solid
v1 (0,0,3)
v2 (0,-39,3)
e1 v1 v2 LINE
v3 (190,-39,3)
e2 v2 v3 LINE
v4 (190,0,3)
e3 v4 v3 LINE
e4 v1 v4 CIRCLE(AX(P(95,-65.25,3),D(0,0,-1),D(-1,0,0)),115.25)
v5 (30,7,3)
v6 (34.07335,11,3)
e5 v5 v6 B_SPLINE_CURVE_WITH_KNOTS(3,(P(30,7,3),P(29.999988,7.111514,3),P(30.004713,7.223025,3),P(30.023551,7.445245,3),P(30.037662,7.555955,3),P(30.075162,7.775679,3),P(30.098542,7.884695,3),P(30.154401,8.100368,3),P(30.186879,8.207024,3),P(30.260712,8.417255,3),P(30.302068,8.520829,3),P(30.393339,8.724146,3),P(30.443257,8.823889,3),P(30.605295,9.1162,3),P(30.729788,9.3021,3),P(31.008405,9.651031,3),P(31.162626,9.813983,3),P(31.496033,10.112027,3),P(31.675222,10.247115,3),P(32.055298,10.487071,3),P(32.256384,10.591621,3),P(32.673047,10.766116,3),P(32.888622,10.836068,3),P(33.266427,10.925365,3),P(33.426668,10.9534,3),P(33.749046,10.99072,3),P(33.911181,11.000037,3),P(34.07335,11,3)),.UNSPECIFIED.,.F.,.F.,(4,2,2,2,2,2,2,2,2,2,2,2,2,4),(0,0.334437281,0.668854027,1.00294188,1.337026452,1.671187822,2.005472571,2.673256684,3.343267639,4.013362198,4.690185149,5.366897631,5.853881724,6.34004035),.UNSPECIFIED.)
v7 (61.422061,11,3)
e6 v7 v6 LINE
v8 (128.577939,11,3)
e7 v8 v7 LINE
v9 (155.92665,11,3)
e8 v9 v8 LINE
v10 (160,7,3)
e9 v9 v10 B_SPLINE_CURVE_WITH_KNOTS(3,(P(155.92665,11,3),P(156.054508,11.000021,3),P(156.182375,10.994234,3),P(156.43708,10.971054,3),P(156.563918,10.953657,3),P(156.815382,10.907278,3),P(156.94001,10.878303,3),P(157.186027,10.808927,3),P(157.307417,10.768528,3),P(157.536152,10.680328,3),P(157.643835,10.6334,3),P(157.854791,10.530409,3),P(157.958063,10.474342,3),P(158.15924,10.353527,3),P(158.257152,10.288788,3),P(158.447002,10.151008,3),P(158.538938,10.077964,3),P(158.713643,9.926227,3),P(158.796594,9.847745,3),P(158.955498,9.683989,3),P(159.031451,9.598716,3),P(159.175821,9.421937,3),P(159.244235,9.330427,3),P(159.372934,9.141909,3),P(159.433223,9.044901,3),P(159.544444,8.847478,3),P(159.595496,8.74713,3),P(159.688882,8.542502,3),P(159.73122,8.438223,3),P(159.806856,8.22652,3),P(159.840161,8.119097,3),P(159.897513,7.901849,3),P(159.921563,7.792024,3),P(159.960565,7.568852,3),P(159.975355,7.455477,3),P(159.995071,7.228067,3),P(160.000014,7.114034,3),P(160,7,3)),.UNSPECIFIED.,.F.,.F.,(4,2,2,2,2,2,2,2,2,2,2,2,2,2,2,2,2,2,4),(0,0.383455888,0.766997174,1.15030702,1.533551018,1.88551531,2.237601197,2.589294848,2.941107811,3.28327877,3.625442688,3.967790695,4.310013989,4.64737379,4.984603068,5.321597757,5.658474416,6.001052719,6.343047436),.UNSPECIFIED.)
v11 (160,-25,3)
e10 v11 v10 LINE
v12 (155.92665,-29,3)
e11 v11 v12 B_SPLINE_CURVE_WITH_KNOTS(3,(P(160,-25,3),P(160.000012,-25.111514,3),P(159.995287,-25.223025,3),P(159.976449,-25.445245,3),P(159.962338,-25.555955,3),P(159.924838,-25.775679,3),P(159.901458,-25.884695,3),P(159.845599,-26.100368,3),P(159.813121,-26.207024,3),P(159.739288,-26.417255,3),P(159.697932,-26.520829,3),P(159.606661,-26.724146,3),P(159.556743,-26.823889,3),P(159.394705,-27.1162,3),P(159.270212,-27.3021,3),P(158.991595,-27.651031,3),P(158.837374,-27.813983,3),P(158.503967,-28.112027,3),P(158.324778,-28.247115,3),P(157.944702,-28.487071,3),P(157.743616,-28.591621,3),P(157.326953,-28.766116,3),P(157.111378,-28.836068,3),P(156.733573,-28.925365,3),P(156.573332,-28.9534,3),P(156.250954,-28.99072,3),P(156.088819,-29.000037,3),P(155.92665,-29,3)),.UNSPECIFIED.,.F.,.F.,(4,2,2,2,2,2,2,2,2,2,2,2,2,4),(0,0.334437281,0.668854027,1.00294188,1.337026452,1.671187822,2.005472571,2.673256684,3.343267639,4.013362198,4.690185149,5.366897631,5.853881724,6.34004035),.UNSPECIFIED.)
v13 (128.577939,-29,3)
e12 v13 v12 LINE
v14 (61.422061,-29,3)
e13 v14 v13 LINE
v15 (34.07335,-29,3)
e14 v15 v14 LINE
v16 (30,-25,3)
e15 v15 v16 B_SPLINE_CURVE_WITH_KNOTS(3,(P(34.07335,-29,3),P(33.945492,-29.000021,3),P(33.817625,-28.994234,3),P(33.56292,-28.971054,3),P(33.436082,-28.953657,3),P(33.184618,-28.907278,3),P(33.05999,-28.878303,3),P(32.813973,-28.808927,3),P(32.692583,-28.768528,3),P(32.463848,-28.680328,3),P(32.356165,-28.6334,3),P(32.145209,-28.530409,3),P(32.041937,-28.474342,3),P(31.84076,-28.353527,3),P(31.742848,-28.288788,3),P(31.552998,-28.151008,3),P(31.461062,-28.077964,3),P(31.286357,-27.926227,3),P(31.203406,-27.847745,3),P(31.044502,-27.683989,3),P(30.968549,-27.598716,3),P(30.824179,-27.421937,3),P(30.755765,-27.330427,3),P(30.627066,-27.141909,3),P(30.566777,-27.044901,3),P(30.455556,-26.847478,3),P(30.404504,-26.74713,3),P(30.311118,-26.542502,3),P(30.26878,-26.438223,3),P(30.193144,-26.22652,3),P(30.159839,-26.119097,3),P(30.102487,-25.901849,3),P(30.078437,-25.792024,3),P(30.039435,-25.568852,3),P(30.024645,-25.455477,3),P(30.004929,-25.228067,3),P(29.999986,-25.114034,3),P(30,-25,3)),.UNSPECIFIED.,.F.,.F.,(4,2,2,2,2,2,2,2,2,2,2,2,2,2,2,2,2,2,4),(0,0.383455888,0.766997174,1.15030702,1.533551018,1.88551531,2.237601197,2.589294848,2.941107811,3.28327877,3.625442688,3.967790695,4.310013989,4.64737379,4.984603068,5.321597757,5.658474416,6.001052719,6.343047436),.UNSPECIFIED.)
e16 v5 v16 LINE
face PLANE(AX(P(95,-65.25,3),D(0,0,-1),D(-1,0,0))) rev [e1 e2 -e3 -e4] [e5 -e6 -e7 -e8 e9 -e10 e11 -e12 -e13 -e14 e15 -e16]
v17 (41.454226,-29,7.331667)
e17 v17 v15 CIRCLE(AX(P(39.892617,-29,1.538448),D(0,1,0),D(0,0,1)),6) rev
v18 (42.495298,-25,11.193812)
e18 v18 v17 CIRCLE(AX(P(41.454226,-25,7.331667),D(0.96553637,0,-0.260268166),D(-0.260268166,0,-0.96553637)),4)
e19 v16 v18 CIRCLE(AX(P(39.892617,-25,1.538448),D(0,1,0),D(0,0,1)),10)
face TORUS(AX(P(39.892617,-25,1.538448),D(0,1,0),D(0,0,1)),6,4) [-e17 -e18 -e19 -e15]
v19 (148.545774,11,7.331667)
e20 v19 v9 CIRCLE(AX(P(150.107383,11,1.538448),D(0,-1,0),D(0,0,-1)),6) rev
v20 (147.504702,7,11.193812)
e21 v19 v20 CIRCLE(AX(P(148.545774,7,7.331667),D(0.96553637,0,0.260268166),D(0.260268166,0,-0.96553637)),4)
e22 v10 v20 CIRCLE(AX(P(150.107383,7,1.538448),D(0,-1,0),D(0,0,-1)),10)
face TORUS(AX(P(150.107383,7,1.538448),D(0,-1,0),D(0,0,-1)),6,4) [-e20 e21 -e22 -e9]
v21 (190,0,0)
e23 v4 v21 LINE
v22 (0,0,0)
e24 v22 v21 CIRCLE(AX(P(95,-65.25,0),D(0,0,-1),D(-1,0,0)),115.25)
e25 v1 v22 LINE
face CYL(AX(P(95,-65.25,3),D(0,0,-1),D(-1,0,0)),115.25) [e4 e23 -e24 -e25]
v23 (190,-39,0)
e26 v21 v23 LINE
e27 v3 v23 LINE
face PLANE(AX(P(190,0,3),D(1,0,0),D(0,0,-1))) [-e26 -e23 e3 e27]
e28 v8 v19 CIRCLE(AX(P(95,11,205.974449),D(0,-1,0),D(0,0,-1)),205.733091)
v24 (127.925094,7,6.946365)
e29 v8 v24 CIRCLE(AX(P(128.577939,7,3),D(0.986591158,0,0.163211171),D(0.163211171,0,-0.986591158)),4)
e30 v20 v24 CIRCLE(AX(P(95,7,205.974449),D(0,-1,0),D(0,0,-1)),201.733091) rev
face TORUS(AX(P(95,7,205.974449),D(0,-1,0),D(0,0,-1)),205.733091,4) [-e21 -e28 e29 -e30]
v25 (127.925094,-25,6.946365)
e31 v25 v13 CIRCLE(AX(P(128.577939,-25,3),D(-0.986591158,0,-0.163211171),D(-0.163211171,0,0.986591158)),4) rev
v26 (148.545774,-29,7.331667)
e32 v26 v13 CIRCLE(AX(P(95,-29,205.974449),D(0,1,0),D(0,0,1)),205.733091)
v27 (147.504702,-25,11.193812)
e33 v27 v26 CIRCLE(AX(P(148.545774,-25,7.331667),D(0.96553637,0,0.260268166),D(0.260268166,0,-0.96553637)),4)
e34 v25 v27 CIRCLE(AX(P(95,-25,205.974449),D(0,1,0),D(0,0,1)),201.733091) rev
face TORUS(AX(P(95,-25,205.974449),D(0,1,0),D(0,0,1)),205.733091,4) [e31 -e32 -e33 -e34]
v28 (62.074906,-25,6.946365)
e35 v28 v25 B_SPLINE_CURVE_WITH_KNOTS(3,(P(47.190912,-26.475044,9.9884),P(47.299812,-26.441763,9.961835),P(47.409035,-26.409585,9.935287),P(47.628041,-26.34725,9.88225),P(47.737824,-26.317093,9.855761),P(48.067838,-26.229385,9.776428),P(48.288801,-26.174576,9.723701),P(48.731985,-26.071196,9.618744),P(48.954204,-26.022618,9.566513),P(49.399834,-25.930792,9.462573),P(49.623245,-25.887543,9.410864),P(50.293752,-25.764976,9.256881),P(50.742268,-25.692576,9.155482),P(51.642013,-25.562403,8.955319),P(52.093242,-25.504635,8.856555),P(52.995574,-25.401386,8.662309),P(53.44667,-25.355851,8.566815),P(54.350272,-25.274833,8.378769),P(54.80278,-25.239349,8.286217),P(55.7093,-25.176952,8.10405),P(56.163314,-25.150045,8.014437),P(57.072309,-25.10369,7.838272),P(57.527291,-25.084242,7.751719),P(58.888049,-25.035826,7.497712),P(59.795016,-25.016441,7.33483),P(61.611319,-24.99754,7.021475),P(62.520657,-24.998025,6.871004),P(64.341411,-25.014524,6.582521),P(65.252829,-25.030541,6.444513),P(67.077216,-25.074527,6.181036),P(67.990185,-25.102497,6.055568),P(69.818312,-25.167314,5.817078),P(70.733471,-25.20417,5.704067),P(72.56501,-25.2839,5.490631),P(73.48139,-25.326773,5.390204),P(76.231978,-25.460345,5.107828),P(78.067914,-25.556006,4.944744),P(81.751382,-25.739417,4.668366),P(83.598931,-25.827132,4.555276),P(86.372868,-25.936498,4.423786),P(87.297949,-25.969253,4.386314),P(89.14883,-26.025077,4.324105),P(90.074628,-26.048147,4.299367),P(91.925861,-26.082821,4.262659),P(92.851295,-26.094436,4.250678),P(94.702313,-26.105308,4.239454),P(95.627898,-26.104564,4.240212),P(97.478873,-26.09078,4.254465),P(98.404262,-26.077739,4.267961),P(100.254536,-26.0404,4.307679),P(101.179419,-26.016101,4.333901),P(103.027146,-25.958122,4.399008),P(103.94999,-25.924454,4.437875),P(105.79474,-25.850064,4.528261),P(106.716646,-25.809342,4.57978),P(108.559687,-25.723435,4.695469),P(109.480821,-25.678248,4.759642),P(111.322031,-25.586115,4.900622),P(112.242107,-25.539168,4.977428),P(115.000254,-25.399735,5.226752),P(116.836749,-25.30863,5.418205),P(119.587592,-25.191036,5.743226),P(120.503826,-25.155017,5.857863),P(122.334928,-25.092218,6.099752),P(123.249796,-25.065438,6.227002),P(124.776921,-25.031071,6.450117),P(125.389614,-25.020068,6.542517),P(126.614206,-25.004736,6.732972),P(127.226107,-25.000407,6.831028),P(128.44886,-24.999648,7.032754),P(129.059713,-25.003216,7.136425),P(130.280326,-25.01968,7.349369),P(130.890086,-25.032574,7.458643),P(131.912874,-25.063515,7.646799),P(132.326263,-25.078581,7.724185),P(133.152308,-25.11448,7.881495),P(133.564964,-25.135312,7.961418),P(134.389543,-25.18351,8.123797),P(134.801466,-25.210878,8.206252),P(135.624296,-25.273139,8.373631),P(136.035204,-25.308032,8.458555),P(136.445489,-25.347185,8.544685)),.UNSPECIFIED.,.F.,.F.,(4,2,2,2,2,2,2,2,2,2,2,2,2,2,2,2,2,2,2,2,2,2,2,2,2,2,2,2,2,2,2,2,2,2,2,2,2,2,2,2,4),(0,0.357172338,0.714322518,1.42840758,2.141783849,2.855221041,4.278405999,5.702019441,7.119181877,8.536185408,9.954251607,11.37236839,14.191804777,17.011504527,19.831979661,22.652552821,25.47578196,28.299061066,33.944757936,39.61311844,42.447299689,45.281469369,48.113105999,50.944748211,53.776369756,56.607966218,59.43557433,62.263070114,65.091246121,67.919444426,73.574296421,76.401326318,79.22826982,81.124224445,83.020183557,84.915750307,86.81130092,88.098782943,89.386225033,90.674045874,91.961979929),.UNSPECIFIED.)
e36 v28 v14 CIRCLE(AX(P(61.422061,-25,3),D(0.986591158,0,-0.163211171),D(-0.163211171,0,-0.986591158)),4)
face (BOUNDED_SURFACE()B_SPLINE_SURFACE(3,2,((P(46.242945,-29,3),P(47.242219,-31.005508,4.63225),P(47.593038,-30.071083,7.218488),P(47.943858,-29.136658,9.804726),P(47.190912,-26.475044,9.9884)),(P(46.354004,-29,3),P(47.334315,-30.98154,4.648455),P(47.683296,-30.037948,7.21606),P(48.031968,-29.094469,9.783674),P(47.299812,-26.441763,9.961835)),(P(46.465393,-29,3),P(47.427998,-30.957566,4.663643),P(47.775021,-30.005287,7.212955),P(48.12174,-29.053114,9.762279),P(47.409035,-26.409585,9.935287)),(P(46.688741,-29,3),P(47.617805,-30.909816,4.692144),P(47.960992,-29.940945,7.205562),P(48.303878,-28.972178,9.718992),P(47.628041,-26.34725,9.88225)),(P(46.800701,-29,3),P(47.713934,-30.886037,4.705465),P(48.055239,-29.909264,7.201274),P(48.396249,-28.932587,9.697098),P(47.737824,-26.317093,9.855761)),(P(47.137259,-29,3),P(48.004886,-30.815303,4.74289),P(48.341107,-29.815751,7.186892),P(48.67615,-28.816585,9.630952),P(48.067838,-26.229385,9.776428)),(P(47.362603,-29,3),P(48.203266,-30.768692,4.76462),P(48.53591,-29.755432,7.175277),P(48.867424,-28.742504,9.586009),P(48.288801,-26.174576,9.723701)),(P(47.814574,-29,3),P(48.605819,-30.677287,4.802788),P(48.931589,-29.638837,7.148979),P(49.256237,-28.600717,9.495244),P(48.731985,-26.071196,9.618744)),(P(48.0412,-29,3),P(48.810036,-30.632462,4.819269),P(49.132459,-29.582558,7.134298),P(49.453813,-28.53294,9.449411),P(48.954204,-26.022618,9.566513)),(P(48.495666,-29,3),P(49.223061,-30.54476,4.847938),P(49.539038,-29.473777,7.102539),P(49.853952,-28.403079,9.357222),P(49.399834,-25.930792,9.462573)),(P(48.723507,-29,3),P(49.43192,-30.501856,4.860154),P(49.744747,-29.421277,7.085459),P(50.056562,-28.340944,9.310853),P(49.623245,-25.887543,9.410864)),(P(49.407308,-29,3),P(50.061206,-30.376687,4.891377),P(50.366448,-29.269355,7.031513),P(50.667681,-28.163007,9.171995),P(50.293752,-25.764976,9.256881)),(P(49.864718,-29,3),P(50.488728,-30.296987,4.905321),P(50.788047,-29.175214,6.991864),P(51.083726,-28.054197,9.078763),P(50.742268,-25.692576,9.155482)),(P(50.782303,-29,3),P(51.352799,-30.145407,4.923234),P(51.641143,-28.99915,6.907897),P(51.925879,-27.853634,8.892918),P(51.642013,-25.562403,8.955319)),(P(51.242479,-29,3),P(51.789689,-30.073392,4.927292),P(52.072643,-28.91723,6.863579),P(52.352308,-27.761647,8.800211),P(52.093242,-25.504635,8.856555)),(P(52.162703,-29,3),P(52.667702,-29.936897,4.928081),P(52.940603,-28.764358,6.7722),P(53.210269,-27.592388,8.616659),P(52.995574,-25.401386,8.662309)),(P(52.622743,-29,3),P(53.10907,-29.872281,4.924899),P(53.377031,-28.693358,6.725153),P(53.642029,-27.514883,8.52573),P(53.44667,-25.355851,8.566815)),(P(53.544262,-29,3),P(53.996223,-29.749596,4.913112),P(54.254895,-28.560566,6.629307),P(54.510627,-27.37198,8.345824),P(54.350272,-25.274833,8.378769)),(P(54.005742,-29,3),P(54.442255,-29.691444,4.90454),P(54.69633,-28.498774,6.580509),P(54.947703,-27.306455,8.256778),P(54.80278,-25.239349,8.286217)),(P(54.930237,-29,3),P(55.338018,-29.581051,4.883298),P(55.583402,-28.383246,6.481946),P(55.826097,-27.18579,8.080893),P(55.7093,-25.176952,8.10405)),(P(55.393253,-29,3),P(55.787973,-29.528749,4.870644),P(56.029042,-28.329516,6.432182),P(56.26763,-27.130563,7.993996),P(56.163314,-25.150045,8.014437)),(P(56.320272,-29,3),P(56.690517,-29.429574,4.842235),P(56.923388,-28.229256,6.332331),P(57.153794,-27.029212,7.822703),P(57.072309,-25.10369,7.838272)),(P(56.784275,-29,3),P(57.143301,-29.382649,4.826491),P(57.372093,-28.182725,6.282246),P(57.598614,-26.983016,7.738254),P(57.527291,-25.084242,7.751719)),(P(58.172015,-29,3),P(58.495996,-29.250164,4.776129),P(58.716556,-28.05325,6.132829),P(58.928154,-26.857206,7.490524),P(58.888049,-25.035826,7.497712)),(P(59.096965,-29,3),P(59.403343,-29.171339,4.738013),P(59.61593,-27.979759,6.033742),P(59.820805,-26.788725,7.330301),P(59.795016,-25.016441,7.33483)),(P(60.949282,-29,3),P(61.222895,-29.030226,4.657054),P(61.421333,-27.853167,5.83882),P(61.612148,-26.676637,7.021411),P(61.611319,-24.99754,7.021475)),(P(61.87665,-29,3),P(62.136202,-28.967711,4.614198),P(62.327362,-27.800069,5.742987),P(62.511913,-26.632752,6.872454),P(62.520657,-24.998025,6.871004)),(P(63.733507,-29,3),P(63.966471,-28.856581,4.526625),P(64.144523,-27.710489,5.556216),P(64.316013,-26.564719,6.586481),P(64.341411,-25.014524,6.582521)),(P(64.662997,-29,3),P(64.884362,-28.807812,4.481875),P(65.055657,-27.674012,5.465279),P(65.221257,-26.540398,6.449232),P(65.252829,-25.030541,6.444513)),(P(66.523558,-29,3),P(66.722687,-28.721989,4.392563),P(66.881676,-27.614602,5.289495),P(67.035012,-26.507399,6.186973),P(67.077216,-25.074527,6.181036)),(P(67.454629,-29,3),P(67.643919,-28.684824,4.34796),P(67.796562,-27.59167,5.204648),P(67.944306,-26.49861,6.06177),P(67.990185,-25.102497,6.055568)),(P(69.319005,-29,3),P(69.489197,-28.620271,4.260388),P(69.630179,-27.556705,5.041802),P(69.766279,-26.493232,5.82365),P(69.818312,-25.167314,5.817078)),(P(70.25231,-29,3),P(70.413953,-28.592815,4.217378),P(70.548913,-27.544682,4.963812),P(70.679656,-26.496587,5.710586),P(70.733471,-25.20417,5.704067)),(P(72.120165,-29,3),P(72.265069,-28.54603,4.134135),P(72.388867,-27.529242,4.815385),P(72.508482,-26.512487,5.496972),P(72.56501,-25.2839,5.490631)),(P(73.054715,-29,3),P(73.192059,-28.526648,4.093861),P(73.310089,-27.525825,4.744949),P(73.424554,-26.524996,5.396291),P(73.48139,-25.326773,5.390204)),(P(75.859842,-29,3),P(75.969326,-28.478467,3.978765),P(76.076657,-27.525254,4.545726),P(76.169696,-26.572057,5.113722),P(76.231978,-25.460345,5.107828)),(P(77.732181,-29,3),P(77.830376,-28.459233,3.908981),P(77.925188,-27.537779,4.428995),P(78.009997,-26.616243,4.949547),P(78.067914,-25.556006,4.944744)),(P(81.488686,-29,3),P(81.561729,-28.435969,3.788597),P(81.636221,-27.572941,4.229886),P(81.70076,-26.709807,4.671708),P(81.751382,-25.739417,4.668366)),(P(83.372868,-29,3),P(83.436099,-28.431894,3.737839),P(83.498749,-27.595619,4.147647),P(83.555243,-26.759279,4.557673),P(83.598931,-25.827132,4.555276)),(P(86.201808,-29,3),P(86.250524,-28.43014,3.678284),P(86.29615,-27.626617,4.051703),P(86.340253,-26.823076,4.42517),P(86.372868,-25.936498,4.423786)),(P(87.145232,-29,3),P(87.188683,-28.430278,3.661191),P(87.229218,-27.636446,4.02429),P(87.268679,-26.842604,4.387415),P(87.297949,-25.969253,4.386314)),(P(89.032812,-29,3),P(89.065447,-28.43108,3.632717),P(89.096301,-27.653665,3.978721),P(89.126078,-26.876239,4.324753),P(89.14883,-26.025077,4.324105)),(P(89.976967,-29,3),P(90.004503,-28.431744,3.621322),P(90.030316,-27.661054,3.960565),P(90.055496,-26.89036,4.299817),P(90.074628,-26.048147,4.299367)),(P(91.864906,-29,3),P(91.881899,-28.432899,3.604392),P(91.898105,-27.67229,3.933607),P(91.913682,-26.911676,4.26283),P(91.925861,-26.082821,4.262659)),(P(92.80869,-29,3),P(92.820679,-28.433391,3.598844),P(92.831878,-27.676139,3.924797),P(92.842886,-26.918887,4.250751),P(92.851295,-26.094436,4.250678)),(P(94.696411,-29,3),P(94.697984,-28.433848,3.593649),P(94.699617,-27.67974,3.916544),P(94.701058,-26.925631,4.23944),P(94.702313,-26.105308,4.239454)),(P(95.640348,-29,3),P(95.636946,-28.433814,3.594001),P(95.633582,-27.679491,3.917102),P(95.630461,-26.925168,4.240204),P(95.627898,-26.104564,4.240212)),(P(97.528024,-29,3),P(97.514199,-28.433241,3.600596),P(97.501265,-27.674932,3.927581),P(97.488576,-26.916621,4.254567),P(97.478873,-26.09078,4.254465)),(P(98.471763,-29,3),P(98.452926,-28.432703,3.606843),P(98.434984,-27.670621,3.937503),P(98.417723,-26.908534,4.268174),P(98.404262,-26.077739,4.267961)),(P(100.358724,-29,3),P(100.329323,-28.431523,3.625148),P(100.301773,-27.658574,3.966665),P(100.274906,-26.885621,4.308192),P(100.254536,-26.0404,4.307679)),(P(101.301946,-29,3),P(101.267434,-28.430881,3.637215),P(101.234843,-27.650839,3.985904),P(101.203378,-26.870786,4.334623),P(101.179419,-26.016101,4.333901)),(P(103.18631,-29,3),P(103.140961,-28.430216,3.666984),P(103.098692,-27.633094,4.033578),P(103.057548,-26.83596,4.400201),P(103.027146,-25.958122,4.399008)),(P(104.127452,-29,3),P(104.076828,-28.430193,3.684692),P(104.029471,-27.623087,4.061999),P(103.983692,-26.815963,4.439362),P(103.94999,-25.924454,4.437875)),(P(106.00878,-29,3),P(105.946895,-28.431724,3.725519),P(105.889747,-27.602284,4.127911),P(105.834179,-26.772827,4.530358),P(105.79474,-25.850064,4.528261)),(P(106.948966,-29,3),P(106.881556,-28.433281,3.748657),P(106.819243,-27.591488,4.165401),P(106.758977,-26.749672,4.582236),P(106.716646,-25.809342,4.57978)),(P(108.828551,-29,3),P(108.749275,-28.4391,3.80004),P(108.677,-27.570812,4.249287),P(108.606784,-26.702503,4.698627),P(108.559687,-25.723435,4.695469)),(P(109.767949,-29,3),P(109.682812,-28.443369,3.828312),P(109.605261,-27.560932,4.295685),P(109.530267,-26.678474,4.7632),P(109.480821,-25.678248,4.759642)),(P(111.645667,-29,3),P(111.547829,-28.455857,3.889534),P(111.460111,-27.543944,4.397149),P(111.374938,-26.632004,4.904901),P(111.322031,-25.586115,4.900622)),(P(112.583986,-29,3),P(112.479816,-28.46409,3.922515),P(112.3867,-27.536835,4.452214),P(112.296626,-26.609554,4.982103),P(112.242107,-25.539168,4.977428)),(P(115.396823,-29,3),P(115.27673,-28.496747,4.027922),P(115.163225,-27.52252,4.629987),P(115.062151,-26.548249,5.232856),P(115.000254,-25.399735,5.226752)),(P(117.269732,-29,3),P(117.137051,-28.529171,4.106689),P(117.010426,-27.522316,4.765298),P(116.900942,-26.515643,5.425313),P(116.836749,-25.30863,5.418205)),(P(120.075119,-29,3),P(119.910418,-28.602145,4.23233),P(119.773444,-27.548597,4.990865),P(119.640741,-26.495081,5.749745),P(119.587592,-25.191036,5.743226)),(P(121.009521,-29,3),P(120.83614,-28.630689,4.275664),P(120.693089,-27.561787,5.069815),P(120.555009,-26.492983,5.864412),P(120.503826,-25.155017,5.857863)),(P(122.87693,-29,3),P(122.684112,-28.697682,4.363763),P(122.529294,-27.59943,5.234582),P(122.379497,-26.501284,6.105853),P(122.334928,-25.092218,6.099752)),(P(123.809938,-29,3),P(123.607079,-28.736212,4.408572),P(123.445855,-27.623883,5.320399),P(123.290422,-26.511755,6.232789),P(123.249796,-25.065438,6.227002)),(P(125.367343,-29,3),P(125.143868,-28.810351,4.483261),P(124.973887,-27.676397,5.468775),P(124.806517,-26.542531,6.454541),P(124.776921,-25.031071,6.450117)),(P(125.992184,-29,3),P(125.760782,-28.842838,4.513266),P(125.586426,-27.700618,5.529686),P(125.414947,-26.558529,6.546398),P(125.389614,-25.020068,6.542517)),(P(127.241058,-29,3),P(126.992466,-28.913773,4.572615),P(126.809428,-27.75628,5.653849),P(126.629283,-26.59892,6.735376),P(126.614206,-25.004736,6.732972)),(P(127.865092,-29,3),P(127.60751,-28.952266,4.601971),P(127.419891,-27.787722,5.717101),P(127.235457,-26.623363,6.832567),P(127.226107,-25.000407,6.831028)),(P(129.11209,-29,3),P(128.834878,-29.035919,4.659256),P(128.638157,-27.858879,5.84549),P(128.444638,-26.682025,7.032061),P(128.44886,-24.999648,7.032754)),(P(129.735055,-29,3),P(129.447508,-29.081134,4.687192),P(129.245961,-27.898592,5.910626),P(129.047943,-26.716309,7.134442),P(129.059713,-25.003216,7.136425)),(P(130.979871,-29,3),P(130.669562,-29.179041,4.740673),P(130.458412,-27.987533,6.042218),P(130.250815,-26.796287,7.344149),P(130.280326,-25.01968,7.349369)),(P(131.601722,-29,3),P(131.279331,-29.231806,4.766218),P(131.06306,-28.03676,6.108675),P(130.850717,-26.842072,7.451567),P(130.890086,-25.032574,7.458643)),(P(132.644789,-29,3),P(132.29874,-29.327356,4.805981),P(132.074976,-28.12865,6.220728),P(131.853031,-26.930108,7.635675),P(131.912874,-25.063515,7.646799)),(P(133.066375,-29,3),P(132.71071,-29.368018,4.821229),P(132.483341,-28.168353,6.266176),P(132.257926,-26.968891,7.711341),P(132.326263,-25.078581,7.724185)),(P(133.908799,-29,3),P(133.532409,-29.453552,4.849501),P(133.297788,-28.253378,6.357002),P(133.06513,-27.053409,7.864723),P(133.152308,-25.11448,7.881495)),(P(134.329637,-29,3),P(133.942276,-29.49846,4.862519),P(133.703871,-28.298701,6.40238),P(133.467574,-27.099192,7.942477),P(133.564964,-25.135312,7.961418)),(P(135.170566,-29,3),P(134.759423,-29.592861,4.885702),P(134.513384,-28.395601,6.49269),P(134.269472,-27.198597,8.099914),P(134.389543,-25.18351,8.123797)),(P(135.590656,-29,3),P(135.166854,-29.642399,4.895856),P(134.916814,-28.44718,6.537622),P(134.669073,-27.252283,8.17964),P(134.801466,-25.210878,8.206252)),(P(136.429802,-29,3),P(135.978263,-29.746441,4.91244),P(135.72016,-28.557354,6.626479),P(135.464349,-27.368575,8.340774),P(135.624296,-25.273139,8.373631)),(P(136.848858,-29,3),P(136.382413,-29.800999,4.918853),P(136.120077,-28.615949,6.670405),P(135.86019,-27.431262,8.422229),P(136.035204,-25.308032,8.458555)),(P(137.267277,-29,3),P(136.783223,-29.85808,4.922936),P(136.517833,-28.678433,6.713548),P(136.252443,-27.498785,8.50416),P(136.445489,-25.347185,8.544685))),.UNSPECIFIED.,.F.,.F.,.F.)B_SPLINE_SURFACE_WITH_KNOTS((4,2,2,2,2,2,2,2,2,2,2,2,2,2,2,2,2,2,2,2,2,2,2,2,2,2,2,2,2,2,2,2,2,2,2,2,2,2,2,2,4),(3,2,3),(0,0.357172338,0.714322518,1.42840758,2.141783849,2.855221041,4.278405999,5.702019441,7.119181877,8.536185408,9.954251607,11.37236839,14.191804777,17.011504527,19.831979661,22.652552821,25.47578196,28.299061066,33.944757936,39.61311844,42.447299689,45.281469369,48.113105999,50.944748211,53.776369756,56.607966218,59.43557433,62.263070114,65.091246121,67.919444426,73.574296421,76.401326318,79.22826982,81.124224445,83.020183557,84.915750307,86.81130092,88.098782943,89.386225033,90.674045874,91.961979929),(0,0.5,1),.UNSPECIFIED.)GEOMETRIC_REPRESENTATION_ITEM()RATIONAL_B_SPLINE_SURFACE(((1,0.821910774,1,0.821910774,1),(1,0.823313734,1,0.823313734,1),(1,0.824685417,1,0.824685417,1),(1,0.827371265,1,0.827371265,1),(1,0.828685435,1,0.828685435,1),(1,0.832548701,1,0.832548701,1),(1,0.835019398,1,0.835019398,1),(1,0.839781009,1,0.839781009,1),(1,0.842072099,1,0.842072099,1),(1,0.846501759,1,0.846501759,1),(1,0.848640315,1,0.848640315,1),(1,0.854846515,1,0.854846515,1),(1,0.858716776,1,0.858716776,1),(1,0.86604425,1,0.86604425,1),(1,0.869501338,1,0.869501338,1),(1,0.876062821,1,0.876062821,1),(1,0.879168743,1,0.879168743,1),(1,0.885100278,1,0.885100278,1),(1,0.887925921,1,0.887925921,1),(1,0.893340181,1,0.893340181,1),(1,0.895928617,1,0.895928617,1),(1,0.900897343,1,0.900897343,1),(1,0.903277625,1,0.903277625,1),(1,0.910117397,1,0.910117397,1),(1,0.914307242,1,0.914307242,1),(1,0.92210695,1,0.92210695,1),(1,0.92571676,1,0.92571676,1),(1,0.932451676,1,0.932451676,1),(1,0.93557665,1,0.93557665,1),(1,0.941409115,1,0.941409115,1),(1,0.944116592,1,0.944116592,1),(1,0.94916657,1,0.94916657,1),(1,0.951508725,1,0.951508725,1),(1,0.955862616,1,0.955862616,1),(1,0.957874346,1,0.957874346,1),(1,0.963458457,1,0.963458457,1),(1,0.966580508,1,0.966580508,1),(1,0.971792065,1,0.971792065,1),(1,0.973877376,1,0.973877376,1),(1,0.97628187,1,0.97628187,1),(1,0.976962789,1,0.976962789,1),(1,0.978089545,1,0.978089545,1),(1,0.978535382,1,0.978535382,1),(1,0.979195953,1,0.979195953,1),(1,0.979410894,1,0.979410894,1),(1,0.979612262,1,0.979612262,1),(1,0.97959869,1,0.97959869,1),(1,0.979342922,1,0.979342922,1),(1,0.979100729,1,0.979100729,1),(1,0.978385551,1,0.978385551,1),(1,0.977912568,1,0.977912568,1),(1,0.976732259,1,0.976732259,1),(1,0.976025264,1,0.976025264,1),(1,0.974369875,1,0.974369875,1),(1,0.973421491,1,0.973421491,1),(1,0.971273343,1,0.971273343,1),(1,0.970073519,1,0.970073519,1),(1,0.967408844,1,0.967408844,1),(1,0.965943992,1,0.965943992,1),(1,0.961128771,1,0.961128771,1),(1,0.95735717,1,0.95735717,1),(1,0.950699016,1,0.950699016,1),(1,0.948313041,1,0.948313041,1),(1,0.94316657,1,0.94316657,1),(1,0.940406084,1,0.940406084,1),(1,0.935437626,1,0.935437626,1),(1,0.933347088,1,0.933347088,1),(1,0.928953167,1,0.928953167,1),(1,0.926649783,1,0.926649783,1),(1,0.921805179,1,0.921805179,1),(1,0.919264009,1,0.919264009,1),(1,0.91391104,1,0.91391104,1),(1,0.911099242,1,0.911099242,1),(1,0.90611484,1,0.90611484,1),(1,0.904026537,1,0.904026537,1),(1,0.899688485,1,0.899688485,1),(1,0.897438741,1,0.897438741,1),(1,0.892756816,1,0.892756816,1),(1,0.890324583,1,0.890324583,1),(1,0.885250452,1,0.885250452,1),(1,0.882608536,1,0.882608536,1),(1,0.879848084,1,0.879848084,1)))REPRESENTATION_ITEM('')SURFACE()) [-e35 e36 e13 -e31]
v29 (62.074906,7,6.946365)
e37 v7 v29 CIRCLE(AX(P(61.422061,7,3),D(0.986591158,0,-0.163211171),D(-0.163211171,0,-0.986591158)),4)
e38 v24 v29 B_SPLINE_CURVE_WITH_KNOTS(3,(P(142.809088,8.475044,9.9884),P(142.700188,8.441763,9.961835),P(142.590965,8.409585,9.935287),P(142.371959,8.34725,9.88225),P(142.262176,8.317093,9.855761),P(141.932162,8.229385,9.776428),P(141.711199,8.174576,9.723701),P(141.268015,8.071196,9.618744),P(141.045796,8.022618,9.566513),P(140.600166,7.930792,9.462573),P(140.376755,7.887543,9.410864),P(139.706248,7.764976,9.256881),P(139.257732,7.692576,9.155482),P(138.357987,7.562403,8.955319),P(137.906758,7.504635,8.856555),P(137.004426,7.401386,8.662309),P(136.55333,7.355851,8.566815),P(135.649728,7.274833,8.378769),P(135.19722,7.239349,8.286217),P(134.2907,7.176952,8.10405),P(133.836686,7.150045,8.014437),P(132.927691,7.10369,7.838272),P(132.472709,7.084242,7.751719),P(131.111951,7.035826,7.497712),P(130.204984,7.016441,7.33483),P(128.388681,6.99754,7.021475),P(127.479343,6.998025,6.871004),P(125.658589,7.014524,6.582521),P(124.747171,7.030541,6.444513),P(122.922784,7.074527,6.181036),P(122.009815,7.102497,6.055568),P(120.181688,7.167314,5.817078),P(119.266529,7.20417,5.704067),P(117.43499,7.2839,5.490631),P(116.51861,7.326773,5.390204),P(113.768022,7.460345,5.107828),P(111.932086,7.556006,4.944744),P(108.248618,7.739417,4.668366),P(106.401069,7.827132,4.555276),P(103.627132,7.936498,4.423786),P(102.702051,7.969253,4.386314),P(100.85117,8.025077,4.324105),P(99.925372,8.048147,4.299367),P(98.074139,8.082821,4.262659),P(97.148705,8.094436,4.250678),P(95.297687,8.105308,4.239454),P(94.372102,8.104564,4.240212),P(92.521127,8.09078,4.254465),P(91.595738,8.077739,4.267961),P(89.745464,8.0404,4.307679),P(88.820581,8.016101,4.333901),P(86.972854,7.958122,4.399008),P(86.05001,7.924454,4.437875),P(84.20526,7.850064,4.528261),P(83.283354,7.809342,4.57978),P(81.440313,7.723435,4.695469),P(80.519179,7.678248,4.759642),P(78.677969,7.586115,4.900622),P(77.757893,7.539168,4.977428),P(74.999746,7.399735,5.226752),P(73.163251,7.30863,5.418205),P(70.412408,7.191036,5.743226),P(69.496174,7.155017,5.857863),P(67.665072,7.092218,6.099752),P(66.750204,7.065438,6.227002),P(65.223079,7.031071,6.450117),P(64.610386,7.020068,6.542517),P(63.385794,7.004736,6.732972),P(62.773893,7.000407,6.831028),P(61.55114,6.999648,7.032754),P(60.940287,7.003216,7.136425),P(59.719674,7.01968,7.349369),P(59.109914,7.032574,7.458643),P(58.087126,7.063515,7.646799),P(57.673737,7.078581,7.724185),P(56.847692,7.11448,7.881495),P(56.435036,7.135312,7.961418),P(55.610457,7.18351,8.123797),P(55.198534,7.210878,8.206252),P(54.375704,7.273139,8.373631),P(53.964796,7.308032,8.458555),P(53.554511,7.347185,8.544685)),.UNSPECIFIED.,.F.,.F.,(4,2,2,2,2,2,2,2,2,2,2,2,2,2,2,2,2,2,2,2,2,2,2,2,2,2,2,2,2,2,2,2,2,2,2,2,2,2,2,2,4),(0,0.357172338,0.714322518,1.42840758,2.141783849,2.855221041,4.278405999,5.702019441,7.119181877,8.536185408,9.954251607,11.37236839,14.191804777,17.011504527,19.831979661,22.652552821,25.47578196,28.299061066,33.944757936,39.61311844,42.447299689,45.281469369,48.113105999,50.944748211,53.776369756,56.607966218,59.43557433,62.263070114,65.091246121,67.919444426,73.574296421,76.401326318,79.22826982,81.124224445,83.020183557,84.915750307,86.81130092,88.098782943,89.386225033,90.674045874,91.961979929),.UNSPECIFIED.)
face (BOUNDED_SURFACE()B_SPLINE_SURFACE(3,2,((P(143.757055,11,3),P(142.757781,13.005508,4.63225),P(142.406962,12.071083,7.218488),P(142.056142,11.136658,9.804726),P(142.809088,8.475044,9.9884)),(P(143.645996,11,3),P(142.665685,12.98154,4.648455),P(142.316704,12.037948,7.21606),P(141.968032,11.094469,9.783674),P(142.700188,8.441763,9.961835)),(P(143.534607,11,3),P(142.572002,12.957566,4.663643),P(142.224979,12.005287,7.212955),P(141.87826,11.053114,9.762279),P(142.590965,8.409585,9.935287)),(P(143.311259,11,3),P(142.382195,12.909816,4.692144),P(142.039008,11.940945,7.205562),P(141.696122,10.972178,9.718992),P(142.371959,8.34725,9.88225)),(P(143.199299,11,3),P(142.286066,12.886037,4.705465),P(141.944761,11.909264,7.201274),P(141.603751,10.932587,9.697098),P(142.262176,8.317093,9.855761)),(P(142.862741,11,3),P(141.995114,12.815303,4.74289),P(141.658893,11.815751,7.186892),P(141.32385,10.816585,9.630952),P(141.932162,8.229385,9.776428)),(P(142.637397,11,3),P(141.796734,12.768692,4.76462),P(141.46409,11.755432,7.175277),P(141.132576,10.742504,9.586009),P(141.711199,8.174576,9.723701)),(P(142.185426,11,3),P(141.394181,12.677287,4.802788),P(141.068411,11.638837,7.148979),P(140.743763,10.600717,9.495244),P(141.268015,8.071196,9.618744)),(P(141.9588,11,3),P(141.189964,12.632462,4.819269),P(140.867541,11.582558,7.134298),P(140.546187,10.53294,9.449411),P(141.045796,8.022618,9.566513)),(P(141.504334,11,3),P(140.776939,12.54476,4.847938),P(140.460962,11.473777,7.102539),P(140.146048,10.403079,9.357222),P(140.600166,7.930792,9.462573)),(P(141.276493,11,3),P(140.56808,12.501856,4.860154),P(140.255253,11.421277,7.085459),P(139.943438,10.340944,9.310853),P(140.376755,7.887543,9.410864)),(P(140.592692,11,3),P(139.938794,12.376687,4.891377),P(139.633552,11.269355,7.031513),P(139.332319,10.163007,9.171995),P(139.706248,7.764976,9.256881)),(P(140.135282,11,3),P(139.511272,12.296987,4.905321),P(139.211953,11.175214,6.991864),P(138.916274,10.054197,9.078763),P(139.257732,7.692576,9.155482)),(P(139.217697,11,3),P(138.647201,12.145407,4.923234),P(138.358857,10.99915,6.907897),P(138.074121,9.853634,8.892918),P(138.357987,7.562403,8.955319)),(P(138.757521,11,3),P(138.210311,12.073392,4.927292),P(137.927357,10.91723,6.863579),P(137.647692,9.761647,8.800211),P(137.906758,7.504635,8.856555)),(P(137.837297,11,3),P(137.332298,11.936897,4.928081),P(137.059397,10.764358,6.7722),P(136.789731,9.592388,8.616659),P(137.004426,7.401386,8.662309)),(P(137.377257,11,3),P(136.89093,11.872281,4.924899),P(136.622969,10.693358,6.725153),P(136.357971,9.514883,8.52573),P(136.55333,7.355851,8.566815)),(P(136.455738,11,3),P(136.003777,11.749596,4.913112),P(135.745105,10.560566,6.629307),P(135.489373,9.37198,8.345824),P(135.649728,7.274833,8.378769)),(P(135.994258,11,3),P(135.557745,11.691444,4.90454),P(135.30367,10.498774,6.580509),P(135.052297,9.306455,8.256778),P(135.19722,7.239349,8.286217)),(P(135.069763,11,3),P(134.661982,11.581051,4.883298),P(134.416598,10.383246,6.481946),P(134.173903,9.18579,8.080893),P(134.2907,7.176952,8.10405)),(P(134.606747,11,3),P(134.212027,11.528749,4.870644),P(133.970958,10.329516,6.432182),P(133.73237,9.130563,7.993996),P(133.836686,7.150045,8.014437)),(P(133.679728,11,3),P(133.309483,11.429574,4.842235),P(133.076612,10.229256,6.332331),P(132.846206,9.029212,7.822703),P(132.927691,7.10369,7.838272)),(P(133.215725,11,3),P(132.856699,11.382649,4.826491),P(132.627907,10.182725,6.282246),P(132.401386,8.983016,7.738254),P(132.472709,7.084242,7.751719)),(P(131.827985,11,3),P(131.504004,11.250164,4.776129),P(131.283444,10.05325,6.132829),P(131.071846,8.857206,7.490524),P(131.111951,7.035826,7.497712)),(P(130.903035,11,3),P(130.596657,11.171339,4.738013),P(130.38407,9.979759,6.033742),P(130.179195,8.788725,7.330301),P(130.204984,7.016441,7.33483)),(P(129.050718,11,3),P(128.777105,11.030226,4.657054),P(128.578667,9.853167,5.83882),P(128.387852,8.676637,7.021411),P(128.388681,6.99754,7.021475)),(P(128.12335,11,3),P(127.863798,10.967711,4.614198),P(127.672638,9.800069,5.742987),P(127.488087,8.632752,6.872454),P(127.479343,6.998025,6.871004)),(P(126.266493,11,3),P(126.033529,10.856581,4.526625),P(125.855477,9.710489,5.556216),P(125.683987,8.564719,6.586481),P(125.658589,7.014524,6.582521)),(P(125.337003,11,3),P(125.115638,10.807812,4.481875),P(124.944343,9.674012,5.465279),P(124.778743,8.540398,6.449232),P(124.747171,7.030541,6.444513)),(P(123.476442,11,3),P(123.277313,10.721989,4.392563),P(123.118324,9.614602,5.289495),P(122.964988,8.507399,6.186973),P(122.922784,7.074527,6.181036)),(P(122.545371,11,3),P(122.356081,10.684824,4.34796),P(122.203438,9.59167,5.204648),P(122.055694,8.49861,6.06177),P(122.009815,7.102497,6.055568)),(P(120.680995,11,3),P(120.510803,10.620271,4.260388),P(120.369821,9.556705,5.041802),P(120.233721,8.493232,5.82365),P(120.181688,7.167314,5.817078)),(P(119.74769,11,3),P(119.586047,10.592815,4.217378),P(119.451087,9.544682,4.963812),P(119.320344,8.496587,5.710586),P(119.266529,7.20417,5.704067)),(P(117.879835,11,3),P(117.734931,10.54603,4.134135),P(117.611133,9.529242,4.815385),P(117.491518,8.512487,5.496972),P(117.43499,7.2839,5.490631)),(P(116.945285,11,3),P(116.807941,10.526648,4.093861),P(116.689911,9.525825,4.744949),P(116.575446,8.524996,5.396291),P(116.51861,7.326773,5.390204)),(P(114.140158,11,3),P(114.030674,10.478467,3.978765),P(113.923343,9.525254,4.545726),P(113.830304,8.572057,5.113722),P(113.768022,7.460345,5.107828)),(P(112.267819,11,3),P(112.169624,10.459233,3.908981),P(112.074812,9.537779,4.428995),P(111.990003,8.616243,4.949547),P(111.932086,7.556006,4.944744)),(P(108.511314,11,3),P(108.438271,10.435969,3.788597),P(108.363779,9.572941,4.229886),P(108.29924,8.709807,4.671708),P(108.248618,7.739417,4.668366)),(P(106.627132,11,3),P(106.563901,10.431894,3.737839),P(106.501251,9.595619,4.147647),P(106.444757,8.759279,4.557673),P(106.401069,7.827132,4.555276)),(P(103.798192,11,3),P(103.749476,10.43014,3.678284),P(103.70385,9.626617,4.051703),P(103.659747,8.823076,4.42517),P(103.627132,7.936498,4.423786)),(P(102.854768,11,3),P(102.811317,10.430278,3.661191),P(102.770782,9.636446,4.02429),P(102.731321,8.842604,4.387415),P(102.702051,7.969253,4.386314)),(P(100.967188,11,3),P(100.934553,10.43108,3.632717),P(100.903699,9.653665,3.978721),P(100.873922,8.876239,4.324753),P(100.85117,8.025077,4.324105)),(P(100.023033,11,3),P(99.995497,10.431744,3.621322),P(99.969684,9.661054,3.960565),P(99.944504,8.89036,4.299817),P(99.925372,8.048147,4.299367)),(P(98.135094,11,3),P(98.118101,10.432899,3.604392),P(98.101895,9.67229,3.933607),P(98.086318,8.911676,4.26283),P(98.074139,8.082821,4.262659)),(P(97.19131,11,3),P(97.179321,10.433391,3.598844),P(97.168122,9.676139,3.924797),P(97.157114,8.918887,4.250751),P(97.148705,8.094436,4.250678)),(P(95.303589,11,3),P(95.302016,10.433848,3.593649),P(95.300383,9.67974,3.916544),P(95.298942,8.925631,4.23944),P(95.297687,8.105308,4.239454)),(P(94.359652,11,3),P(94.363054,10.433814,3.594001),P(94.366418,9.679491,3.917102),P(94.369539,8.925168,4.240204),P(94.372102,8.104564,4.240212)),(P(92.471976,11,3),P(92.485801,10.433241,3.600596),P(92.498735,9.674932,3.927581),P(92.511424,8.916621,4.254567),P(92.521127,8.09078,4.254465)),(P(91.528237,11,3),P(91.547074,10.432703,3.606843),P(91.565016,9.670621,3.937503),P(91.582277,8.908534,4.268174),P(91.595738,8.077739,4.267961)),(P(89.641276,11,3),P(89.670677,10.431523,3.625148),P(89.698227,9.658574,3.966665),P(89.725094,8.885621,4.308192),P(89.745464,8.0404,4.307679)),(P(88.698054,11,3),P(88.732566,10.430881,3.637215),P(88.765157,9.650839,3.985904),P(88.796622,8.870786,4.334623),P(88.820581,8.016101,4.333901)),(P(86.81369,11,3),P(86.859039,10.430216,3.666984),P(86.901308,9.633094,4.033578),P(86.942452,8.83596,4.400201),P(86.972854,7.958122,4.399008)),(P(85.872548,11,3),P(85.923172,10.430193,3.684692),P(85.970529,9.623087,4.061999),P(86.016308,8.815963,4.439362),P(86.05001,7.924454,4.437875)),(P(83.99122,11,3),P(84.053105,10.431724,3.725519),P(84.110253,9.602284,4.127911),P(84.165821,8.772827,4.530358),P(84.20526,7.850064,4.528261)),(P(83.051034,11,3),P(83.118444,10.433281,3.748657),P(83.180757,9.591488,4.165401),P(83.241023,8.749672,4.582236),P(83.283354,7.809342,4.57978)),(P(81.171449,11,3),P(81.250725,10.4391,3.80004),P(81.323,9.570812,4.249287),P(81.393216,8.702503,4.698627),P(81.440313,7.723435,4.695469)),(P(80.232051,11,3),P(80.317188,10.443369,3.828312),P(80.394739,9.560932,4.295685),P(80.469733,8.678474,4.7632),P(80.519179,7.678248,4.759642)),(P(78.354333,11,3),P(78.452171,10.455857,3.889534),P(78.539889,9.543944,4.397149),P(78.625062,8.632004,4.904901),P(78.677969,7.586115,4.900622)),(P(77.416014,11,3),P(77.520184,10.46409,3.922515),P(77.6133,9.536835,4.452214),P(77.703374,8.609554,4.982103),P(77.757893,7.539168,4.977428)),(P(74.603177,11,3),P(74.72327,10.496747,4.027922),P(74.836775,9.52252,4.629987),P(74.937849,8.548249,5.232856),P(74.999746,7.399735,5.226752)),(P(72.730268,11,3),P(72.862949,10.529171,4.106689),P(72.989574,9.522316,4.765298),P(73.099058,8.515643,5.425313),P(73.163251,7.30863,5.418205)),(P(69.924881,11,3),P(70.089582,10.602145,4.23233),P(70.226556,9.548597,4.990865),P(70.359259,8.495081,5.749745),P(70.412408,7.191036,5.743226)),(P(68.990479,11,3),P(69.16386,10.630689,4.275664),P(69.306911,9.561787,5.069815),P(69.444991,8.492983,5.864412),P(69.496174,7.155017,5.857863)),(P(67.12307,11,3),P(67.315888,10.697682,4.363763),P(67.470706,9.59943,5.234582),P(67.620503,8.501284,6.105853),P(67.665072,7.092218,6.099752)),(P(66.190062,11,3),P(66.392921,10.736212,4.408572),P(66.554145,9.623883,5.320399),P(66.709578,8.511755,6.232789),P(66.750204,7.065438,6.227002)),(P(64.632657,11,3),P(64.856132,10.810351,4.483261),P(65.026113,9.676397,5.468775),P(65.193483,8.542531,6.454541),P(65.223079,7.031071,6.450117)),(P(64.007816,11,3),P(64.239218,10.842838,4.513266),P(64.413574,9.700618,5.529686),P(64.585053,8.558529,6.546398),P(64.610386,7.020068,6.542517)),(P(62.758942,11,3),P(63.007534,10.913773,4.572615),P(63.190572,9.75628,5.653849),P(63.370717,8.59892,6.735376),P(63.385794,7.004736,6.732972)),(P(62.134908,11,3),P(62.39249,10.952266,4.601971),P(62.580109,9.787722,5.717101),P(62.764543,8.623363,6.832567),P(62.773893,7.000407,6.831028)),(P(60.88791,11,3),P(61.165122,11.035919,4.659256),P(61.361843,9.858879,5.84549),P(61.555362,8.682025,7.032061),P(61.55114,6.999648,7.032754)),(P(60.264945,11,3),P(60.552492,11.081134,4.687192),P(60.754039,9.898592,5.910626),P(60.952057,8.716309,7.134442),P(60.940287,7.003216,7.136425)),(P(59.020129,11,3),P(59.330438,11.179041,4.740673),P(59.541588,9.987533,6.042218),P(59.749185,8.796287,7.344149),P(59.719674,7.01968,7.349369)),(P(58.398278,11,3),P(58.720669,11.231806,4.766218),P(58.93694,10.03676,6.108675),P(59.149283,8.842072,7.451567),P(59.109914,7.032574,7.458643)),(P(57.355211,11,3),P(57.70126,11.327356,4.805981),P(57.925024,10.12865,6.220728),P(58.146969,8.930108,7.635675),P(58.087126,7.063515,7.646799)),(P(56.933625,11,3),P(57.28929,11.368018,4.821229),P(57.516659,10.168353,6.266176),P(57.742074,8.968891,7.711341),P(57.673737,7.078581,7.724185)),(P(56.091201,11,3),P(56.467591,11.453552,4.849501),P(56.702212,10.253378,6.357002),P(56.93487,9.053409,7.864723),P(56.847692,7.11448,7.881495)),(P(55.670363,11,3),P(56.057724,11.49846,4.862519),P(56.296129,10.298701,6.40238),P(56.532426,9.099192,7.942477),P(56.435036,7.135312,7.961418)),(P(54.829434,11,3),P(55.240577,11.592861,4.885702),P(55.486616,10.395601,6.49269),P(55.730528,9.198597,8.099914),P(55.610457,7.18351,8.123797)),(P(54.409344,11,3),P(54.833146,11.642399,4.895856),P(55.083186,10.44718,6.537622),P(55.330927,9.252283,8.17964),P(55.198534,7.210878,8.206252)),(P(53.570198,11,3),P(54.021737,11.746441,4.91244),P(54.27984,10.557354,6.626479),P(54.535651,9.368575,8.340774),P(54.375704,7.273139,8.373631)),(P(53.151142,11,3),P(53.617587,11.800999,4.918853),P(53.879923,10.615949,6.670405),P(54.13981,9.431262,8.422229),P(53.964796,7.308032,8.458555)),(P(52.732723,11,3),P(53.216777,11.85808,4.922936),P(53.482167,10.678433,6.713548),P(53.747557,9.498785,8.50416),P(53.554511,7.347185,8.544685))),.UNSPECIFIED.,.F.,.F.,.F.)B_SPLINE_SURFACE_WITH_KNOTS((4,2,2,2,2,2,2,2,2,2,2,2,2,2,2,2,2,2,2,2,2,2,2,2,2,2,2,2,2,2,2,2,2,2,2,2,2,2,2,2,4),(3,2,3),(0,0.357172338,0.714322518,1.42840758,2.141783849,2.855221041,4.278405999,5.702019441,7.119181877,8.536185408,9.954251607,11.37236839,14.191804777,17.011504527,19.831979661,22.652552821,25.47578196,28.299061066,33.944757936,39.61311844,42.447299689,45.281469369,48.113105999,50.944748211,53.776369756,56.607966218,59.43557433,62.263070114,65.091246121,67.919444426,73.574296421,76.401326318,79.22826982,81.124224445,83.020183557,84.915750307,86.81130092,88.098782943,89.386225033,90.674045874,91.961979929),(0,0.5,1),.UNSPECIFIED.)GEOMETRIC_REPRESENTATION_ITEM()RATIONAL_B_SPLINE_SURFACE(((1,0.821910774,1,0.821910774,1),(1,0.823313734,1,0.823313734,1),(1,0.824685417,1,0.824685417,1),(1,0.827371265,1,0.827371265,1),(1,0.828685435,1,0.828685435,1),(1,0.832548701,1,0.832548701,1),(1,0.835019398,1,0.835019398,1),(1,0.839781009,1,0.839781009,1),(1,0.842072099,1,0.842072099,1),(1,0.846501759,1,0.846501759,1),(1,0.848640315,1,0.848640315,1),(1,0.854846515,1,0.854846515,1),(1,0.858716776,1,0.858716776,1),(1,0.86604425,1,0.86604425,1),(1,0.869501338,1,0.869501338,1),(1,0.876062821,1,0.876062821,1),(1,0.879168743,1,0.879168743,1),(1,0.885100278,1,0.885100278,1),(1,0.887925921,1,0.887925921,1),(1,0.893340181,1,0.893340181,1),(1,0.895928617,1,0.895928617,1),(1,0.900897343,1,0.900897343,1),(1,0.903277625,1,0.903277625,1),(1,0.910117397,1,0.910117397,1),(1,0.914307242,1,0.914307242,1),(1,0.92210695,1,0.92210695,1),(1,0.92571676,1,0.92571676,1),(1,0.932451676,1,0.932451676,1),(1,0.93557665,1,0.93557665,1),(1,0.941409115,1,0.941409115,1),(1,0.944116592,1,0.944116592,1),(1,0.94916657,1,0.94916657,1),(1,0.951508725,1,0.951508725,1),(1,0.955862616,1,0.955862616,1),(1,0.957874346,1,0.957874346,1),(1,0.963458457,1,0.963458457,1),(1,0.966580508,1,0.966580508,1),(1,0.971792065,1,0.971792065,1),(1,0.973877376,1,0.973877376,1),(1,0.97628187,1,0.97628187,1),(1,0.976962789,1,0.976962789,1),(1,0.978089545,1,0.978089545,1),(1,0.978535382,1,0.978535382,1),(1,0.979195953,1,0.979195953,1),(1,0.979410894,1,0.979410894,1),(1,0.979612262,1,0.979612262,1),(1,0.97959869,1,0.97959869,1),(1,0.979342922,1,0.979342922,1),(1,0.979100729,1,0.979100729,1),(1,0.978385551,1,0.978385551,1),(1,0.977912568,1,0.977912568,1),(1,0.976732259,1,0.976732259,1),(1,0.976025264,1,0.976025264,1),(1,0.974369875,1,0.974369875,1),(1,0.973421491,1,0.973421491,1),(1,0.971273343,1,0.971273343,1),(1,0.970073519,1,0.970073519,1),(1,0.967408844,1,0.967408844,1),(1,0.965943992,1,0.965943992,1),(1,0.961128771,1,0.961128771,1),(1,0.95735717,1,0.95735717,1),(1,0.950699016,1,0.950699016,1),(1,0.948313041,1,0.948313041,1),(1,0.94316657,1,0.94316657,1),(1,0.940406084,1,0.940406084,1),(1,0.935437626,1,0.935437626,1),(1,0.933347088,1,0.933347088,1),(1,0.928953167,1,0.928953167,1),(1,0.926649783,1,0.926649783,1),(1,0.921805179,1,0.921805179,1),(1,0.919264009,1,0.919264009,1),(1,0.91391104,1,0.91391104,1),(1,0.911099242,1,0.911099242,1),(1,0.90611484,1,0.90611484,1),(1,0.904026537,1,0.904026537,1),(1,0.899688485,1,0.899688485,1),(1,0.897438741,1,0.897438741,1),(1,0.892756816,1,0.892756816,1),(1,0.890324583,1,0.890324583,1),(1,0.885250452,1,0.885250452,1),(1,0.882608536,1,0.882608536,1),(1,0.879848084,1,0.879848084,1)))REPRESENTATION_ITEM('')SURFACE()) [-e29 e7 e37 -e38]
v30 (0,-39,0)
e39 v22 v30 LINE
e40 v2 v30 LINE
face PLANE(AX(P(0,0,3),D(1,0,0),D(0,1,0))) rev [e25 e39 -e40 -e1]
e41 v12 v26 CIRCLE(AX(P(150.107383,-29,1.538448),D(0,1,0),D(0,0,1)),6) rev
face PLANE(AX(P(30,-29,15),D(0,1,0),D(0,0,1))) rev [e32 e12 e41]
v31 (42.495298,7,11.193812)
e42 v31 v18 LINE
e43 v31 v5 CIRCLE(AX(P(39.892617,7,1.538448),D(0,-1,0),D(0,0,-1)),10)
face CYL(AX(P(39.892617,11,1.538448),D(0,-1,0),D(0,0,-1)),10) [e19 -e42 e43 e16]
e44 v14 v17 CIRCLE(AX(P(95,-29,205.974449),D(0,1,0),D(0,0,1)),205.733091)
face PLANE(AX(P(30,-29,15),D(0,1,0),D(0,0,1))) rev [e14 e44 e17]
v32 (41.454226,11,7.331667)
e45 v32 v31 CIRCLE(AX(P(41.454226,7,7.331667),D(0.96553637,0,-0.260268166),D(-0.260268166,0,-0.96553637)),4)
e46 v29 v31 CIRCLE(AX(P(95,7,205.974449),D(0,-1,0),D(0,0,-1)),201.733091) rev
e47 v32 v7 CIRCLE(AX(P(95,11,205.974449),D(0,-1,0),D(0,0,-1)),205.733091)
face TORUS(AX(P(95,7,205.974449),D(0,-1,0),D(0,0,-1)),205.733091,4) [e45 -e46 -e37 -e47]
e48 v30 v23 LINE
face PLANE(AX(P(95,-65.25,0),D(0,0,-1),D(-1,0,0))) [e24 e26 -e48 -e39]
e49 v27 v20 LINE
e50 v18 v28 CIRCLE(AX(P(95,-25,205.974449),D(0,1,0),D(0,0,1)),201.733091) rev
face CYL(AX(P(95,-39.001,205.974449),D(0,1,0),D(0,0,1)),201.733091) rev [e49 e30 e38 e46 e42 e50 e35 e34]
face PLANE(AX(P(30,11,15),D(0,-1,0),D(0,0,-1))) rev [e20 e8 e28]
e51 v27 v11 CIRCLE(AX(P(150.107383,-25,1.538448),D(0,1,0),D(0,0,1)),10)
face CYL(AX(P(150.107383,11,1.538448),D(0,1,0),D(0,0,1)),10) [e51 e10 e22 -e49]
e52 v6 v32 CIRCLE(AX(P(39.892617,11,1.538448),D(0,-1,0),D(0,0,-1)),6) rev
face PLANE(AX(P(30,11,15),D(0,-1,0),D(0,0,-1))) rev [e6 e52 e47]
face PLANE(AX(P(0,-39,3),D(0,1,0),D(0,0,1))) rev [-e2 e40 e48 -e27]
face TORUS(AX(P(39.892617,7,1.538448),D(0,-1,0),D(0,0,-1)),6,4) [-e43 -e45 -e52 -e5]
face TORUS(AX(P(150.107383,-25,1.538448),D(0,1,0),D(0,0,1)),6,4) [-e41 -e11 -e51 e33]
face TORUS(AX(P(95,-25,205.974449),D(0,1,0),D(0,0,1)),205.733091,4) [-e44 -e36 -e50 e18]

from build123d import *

# Parameters (mm, degrees)
BOSS_EXTRUDE1_DEPTH = 3
SKETCH2_W           = 130
SKETCH2_H           = 40
BOSS_EXTRUDE2_DEPTH = 12
CUT_EXTRUDE1_REACH  = 199.041
FILLET1_R           = 10
FILLET2_R           = 4


with BuildPart() as part:
    # Sketch1 → Boss-Extrude1 (new body)
    with BuildSketch(Plane.XY):
        with BuildLine():
            Line((190, 0), (190, -39))
            Line((190, -39), (0, -39))
            Line((0, -39), (0, 0))
            ThreePointArc((0, 0), (95, 50), (190, 0))
        make_face()
    extrude(amount=BOSS_EXTRUDE1_DEPTH)

    # Sketch2 → Boss-Extrude2 (add)
    with BuildSketch(Plane.XY.offset(3)):
        with Locations((95, -9)):
            Rectangle(SKETCH2_W, SKETCH2_H)
    extrude(amount=BOSS_EXTRUDE2_DEPTH)

    # Sketch3 → Cut-Extrude1 (cut, up to next)
    with BuildSketch(Plane(origin=(0, 11, 0), x_dir=(1, 0, 0), z_dir=(0, 1, 0)), mode=Mode.PRIVATE) as cut_extrude1_sk1:
        with BuildLine():
            Line((30, -15), (160, -15))
            ThreePointArc((160, -15), (95, -4.241357564), (30, -15))
        make_face()
    cut_extrude1_tool1 = extrude(cut_extrude1_sk1.sketch, amount=-CUT_EXTRUDE1_REACH, mode=Mode.PRIVATE) & part.part
    add(cut_extrude1_tool1.solids().sort_by_distance((95, 11, 10.686553))[0], mode=Mode.SUBTRACT)

    # Fillet1
    # the kernel refuses this fillet: 10 mm, written as the material it takes off along each edge
    with BuildSketch(Plane(origin=(160, 43.655354589, 15), x_dir=(0, 0, -1), z_dir=(0, -1, 0)), Plane(origin=(30, -61.655354589, 15), x_dir=(0, 0, -1), z_dir=(0, 1, 0))) as fillet1_piece_1:
        with BuildLine():
            CenterArc((13.461551545, -9.892616796), FILLET1_R, 98.40417735, 96.681797386)
            Line((3.806187845, -12.495298453), (3.613080571, -12.547352086))
            ThreePointArc((3.613080571, -12.547352086), (1.812932851, -6.275113154), (-0.189333785, -0.064441584))
            Line((-0.189333785, -0.064441584), (0, 0.2))
            ThreePointArc((0, 0.2), (6, 0.2), (11.970768969, 0.197852336))
            Line((11.970768969, 0.197852336), (12, 0))
        make_face()
    extrude(amount=105.310709179, mode=Mode.SUBTRACT)

    # Fillet2
    fillet2_edges = [part.edges().sort_by_distance(p)[0] for p in [
        (95, -29, 4.241357564),
        (95, 11, 4.241357564),
        (34.408965823, 11, 9.900838783),
        (155.591034177, 11, 9.900838783),
        (34.408965823, -29, 9.900838783),
        (155.591034177, -29, 9.900838783),
    ]]
    fillet(fillet2_edges, radius=FILLET2_R)


solid = part.part
